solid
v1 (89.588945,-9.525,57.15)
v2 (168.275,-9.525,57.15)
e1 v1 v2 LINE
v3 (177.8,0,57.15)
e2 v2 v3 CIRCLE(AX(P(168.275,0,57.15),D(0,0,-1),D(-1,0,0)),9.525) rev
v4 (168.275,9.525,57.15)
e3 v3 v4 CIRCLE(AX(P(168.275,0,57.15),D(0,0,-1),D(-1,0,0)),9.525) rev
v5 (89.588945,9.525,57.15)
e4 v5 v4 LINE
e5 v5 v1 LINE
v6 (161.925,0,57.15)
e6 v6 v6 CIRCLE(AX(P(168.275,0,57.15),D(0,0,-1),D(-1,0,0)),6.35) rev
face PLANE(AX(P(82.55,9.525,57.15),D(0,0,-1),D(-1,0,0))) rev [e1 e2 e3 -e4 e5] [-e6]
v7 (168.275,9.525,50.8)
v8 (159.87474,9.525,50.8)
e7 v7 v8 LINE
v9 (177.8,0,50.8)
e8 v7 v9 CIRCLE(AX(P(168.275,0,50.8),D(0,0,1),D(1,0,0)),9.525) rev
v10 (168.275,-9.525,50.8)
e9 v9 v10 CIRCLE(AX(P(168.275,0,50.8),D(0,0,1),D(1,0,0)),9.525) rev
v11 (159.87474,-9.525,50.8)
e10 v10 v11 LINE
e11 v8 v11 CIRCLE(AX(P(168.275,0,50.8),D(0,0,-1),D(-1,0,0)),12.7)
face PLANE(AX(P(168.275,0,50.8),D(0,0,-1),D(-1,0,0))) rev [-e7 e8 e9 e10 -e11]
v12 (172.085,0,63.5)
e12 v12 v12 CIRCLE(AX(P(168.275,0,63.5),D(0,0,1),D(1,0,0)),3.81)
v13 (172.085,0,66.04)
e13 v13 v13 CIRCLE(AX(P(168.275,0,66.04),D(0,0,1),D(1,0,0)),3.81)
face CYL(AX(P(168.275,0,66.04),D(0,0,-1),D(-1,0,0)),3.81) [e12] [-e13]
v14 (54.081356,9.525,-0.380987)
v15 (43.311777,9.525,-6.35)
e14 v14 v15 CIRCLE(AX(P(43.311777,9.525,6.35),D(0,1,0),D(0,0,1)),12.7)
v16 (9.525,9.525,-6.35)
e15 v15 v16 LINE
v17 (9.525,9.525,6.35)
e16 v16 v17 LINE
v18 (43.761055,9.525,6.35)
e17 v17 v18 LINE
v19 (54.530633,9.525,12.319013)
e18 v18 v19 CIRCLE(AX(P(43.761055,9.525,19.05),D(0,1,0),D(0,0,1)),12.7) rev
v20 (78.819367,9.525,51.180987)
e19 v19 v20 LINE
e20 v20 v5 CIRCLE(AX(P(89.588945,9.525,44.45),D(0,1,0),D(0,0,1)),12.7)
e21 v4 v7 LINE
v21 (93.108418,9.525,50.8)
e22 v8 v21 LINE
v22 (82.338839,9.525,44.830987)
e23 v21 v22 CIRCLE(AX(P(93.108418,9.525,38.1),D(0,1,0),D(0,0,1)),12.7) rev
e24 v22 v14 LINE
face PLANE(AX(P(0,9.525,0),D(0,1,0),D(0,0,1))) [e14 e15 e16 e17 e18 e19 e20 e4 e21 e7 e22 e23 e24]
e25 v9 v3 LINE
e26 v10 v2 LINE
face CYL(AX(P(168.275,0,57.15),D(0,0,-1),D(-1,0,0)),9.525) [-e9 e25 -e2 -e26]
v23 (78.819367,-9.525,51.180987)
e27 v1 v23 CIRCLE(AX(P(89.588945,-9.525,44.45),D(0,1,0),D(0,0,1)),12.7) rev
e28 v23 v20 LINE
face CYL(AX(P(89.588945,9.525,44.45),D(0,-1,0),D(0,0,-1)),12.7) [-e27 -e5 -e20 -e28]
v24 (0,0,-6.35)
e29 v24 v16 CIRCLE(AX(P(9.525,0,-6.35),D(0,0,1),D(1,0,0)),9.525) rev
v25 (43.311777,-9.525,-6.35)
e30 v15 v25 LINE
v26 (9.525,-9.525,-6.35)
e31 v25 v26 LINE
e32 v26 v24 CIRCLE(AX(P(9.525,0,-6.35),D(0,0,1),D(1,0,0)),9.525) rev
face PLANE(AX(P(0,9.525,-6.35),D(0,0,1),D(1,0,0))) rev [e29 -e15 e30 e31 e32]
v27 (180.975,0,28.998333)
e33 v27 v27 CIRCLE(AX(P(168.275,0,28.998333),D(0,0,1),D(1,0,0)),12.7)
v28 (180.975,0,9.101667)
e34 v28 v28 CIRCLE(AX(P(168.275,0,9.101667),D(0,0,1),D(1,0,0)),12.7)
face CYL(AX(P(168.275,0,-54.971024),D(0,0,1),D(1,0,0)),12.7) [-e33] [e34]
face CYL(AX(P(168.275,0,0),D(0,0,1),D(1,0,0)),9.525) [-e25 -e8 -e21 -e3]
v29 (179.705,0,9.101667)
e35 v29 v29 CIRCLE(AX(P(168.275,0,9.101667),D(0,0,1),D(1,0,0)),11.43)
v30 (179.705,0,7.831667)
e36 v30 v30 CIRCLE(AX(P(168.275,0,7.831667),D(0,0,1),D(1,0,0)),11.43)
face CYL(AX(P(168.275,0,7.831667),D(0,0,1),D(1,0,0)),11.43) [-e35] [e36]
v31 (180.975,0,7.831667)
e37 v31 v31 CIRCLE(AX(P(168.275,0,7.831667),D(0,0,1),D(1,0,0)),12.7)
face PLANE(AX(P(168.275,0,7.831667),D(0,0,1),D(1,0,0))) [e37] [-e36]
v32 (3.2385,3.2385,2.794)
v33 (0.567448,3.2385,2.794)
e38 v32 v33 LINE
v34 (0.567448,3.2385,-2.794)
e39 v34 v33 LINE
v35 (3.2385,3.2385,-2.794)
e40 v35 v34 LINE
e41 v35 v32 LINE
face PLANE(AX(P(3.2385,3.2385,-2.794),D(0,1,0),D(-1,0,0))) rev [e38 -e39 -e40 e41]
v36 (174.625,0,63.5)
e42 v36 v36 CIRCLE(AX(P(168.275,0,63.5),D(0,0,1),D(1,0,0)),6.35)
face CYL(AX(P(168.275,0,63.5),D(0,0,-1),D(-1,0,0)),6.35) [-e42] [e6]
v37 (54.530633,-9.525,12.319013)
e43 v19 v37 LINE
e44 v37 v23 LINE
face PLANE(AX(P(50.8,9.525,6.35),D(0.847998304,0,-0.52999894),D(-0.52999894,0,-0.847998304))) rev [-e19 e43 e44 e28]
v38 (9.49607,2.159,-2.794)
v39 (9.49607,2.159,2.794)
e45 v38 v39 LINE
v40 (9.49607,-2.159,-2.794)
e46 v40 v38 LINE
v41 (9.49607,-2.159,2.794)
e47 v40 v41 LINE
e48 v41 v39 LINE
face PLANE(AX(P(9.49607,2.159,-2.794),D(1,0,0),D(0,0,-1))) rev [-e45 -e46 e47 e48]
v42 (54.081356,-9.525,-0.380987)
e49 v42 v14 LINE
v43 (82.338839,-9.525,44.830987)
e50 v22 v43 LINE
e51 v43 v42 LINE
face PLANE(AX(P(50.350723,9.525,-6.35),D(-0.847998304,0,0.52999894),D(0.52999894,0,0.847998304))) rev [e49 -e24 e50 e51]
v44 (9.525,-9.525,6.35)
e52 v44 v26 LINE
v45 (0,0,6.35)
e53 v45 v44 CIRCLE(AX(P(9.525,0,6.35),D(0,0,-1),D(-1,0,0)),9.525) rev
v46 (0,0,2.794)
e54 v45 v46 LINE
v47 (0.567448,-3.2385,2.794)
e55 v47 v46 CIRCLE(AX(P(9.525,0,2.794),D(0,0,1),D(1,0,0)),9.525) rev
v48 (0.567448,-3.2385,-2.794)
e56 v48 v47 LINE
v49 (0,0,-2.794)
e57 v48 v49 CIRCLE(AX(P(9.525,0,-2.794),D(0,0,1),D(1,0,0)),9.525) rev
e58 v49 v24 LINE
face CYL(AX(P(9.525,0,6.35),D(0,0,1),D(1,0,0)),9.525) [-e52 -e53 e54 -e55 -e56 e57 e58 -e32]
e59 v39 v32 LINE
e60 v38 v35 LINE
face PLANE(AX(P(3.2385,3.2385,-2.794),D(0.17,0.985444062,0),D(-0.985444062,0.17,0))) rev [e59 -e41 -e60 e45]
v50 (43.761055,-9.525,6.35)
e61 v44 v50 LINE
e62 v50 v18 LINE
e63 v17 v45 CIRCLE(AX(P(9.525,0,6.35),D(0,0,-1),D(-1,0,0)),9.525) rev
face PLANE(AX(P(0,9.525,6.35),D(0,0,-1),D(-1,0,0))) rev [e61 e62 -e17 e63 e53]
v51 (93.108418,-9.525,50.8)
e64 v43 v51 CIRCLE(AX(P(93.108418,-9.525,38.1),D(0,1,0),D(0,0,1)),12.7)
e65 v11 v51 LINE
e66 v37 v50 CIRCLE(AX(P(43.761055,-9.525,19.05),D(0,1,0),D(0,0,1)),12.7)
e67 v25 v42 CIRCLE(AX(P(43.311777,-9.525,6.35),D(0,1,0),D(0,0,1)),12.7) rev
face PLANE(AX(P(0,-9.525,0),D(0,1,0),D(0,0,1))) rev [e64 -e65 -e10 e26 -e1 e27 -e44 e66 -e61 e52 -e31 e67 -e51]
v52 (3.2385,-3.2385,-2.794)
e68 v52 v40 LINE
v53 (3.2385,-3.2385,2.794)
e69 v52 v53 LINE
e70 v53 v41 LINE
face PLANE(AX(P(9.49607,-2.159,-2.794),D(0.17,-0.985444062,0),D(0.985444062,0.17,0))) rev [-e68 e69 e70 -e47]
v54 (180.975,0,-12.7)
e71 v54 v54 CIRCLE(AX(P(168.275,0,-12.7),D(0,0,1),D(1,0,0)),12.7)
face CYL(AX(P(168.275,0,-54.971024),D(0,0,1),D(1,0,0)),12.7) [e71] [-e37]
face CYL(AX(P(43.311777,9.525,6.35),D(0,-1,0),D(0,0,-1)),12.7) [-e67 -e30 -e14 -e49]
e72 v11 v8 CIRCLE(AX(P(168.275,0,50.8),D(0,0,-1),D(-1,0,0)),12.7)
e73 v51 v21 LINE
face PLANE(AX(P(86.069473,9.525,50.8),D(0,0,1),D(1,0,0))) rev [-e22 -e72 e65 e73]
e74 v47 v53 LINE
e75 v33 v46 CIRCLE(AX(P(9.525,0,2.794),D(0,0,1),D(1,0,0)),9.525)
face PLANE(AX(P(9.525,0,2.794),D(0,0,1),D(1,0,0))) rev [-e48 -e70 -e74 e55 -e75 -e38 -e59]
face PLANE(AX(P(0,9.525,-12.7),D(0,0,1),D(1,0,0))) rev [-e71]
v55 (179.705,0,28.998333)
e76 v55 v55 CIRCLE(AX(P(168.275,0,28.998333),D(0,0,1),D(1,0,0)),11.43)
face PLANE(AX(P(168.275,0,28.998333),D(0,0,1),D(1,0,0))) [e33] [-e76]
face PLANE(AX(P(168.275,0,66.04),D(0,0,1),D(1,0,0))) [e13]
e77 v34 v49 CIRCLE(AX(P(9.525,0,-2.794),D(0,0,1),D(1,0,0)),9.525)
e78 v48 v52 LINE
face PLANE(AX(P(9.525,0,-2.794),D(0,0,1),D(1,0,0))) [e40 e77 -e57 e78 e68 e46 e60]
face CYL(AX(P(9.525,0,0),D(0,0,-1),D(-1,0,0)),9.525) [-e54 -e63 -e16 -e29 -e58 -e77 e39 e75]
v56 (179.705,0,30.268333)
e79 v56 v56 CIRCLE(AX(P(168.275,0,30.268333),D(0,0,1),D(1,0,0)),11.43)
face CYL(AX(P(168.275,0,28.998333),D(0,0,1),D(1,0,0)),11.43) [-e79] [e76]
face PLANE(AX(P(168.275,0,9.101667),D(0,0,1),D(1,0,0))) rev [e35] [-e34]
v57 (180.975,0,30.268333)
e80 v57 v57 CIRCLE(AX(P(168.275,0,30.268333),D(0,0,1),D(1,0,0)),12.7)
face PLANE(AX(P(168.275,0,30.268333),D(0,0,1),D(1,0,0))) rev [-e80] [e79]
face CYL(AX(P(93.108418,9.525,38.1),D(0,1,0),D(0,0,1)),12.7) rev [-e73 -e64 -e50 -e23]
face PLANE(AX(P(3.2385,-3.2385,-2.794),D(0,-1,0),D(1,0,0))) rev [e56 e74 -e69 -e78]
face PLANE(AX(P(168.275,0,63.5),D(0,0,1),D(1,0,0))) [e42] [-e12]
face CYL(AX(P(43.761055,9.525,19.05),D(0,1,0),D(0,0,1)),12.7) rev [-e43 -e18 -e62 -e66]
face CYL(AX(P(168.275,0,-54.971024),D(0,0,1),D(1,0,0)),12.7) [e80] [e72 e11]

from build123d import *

# Parameters (mm, degrees)
BOSS_EXTRUDE1_DEPTH    = 9.525
FILLET1_R              = 9.525
FILLET2_R              = 12.7
SKETCH2_R              = 12.7
BOSS_EXTRUDE2_DEPTH    = 63.5
SKETCH4_R              = 12.7
SKETCH4_R_2            = 11.43
CUT_EXTRUDE1_DEPTH     = 0.635
LPATTERN1_COUNT        = 2
LPATTERN1_PITCH        = 21.166666667
SKETCH5_R              = 6.35
BOSS_EXTRUDE3_DEPTH    = 6.35
SKETCH6_R              = 3.81
BOSS_EXTRUDE4_DEPTH    = 2.54
CUT_EXTRUDE2_START     = -1
CUT_EXTRUDE2_OUTLINE_W = 6.477
CUT_EXTRUDE2_OUTLINE_H = 5.588
CUT_EXTRUDE2_DEPTH     = 4.2385
CUT_EXTRUDE2_START_2   = -2.794
CUT_EXTRUDE2_2_DEPTH   = 5.588


with BuildPart() as part:
    # Sketch1 → Boss-Extrude1 (new, symmetric)
    with BuildSketch(Plane(origin=(0, 0, 0), x_dir=(1, 0, 0), z_dir=(0, 1, 0))):
        Polygon((0, -6.35), (0, 6.35), (50.350722524, 6.35), (86.069472524, -50.8), (177.8, -50.8), (177.8, -57.15), (82.55, -57.15), (50.8, -6.35), align=None)
    extrude(amount=BOSS_EXTRUDE1_DEPTH, both=True)

    # Fillet1
    fillet1_edges = [part.edges().sort_by_distance(p)[0] for p in [
        (177.8, -9.525, 53.975),
        (177.8, 9.525, 53.975),
        (0, -9.525, 0),
        (0, 9.525, 0),
    ]]
    fillet(fillet1_edges, radius=FILLET1_R - 0.0001)  # a hair under: the kernel refuses the full size

    # Fillet2
    fillet2_edges = [part.edges().sort_by_distance(p)[0] for p in [
        (50.350722524, 0, -6.35),
        (86.069472524, 0, 50.8),
        (82.55, 0, 57.15),
        (50.8, 0, 6.35),
    ]]
    fillet(fillet2_edges, radius=FILLET2_R)

    # Sketch2 → Boss-Extrude2 (add)
    with BuildSketch(Plane(origin=(0, 0, 50.8), x_dir=(-1, 0, 0), z_dir=(0, 0, -1))):
        with Locations(Location((-168.275, 0, 0), (0, 0, 180))):
            Circle(SKETCH2_R)
    extrude(amount=BOSS_EXTRUDE2_DEPTH)

    # Sketch4 → Cut-Extrude1 (cut, symmetric)
    with BuildSketch(Plane.XY.offset(29.633333333)):
        with Locations((168.275, 0)):
            Circle(SKETCH4_R)
        with Locations((168.275, 0)):
            Circle(SKETCH4_R_2, mode=Mode.SUBTRACT)
    cut_extrude1 = extrude(amount=CUT_EXTRUDE1_DEPTH, both=True, mode=Mode.SUBTRACT)

    # LPattern1: Cut-Extrude1 ×2
    with Locations(*[(0, 0, -i * LPATTERN1_PITCH) for i in range(1, LPATTERN1_COUNT)]):
        add(cut_extrude1, mode=Mode.SUBTRACT)

    # Sketch5 → Boss-Extrude3 (add)
    with BuildSketch(Plane.XY.offset(57.15)):
        with Locations(Location((168.275, 0, 0), (0, 0, 180))):
            Circle(SKETCH5_R)
    extrude(amount=BOSS_EXTRUDE3_DEPTH)

    # Sketch6 → Boss-Extrude4 (add)
    with BuildSketch(Plane.XY.offset(63.5)):
        with Locations((168.275, 0)):
            Circle(SKETCH6_R)
    extrude(amount=BOSS_EXTRUDE4_DEPTH)

    # Cut-Extrude2: read off the stored shape, not the designer's step
    # Cut-Extrude2 outline → Cut-Extrude2 (cut)
    with BuildSketch(Plane.YZ.offset(CUT_EXTRUDE2_START)):
        Rectangle(CUT_EXTRUDE2_OUTLINE_W, CUT_EXTRUDE2_OUTLINE_H)
    extrude(amount=CUT_EXTRUDE2_DEPTH, mode=Mode.SUBTRACT)

    # Cut-Extrude2 2 outline → Cut-Extrude2 2 (cut)
    with BuildSketch(Plane.XY.offset(CUT_EXTRUDE2_START_2)):
        Polygon((9.496069796, -2.159), (9.496069796, 2.159), (3.2385, 3.2385), (3.2385, -3.2385), align=None)
    extrude(amount=CUT_EXTRUDE2_2_DEPTH, mode=Mode.SUBTRACT)


solid = part.part
